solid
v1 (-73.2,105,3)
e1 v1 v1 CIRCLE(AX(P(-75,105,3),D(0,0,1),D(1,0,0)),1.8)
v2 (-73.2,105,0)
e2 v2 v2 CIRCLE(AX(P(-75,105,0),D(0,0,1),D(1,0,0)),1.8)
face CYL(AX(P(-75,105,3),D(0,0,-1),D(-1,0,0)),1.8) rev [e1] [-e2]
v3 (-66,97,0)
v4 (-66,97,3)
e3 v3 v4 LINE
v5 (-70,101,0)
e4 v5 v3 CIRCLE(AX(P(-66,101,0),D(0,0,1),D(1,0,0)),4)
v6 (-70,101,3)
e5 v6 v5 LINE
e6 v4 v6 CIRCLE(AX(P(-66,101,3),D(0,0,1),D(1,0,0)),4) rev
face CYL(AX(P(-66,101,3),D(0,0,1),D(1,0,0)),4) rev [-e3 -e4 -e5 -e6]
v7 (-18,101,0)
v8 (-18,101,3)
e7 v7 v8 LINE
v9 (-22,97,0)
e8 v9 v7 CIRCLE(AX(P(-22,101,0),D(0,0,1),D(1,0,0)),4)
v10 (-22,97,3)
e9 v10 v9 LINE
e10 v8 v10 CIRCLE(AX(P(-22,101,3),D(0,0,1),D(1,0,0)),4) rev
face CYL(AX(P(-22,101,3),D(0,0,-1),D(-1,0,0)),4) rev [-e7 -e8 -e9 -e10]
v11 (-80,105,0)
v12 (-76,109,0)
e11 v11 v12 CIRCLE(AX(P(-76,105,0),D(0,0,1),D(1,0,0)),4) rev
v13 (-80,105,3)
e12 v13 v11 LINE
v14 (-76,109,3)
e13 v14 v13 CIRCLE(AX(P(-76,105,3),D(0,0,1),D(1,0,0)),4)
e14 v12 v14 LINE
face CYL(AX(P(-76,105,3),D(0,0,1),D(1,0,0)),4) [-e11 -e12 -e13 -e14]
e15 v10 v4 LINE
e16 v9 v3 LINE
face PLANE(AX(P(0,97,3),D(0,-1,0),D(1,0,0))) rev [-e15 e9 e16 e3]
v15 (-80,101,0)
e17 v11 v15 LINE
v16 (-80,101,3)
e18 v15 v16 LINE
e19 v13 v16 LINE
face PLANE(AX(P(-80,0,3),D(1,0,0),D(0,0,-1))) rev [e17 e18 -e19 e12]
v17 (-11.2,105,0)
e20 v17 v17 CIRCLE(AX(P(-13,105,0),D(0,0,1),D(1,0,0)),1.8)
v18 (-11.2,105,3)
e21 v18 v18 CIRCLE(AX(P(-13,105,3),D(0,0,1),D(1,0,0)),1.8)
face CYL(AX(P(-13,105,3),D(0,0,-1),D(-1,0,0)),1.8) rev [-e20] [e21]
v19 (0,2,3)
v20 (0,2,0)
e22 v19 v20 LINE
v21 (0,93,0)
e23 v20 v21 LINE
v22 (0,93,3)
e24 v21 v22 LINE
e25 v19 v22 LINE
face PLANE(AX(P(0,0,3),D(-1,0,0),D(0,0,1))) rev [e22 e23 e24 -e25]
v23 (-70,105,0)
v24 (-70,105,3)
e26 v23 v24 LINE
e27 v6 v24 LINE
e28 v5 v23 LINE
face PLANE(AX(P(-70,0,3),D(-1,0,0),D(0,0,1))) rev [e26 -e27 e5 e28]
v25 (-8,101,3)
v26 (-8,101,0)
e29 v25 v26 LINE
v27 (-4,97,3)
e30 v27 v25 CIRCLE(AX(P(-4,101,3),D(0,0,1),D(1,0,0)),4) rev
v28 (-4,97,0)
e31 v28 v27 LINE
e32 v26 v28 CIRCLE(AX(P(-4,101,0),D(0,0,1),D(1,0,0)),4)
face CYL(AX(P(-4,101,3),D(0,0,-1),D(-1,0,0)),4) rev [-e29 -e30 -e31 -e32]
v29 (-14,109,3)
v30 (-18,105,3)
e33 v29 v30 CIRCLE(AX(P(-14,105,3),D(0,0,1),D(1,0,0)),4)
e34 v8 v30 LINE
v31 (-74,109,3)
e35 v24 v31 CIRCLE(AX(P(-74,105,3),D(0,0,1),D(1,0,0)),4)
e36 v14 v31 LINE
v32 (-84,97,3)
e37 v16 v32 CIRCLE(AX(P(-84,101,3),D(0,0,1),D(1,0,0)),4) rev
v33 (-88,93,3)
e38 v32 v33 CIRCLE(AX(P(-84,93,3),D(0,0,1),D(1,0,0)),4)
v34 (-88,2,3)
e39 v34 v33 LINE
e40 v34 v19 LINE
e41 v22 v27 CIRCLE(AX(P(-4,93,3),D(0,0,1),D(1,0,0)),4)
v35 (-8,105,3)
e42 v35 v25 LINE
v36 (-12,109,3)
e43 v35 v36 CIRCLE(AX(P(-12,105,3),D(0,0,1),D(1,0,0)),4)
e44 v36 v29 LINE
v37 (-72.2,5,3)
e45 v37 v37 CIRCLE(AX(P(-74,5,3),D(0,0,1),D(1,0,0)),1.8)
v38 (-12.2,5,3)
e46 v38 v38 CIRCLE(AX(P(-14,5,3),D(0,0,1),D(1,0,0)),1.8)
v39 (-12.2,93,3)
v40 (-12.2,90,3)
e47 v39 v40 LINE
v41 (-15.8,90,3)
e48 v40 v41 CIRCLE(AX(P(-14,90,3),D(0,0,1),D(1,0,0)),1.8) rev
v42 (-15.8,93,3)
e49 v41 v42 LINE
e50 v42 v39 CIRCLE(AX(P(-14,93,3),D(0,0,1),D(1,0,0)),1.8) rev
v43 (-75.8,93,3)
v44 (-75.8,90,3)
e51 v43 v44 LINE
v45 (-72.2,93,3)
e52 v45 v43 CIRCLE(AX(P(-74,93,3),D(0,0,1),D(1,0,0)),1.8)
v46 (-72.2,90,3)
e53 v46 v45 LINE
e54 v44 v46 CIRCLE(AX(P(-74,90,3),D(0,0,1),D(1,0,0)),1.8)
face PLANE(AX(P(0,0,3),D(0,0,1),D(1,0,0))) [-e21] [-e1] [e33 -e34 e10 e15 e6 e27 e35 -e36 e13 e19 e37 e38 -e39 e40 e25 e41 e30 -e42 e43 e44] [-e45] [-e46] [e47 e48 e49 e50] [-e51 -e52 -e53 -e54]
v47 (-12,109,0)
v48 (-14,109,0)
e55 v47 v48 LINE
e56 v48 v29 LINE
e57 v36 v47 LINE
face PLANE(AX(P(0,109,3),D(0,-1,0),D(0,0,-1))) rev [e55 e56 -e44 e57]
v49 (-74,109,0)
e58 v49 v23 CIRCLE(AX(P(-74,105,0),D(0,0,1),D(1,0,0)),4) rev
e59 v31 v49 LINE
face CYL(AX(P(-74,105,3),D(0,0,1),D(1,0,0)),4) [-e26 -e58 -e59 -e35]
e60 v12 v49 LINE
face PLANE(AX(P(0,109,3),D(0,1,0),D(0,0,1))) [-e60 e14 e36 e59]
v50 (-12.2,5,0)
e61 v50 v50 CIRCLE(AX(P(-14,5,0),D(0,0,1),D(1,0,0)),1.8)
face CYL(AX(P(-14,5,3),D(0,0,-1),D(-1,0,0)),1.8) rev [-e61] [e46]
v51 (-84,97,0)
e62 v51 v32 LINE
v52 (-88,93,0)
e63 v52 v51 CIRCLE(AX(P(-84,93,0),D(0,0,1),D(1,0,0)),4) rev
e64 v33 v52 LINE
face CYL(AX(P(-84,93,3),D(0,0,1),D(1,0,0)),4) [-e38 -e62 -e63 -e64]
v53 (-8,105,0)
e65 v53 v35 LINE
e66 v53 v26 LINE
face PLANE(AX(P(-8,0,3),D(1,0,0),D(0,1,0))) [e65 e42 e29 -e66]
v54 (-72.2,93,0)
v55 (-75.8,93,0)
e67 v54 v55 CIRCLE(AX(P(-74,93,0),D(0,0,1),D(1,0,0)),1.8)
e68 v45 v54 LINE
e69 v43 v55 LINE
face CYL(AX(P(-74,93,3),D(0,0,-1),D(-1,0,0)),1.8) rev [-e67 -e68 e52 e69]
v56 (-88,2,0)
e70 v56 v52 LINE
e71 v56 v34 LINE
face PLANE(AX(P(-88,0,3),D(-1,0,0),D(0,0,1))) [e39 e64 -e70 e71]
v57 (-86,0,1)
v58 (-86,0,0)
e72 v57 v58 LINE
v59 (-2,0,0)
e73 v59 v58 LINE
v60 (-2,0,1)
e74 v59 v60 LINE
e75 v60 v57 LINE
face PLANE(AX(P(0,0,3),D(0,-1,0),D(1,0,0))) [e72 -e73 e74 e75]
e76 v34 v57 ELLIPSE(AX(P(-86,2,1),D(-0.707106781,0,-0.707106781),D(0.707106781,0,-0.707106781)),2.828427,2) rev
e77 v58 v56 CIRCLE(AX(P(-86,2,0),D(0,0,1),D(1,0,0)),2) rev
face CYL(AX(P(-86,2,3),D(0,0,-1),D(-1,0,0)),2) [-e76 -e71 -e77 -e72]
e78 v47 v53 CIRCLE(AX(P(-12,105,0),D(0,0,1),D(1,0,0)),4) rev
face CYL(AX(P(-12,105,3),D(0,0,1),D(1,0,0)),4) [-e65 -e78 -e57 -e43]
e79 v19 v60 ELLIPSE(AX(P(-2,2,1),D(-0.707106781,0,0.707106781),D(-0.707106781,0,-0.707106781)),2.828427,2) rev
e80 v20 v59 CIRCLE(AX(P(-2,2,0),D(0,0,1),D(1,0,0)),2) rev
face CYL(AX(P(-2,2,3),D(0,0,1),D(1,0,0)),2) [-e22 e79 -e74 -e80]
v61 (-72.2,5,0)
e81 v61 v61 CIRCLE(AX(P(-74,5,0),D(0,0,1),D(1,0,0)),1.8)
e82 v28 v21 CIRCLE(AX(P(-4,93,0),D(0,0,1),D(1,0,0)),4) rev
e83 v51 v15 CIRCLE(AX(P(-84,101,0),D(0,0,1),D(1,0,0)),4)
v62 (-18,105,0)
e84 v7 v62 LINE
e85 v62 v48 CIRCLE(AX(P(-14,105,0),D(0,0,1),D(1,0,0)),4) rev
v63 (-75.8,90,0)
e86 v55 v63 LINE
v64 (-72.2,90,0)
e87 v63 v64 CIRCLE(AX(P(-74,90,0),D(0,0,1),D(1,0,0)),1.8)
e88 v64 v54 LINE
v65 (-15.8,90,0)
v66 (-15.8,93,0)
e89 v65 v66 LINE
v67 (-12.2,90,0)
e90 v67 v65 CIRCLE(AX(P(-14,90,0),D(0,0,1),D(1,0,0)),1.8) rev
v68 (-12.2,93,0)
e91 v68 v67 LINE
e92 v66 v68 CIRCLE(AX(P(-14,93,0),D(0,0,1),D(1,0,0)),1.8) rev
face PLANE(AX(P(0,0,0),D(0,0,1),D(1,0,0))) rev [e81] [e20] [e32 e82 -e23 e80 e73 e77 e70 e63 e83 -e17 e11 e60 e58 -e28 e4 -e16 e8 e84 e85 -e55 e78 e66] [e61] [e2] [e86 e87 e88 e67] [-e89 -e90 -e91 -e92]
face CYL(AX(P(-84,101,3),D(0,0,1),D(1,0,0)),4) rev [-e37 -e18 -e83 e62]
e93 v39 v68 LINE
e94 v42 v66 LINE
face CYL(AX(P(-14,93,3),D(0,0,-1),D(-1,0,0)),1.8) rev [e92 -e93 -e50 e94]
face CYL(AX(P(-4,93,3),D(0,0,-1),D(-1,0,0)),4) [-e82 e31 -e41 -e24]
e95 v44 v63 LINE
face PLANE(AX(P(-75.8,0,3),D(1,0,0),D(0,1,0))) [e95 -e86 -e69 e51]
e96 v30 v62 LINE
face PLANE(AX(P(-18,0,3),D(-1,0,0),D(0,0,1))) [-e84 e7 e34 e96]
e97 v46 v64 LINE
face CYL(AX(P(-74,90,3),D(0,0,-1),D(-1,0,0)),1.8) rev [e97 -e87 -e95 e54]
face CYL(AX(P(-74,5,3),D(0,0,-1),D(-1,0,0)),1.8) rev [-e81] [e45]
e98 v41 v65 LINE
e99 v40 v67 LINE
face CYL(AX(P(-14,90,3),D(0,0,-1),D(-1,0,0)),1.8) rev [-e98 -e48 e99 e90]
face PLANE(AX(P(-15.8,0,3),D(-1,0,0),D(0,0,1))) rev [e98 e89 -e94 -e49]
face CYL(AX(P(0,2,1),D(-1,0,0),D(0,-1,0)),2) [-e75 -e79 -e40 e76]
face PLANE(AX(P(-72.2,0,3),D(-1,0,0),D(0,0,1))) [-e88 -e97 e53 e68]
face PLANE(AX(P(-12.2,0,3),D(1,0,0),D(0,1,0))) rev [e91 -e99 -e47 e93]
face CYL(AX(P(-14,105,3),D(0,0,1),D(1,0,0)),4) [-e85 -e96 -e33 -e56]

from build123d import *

# Parameters (mm, degrees)
SKETCH1_R           = 1.8
BOSS_EXTRUDE1_DEPTH = 3
FILLET1_R           = 4
FILLET2_R           = 2


with BuildPart() as part:
    # Sketch1 → Boss-Extrude1 (new body)
    with BuildSketch(Plane.XY):
        Polygon((-88, 0), (0, 0), (0, 97), (-8, 97), (-8, 109), (-18, 109), (-18, 97), (-70, 97), (-70, 109), (-80, 109), (-80, 97), (-88, 97), align=None)
        with Locations((-74, 5)):
            Circle(SKETCH1_R, mode=Mode.SUBTRACT)
        with Locations((-14, 5)):
            Circle(SKETCH1_R, mode=Mode.SUBTRACT)
        with BuildLine():
            ThreePointArc((-75.8, 93), (-74, 94.8), (-72.2, 93))
            Line((-72.2, 93), (-72.2, 90))
            ThreePointArc((-72.2, 90), (-74, 88.2), (-75.8, 90))
            Line((-75.8, 90), (-75.8, 93))
        make_face(mode=Mode.SUBTRACT)
        with BuildLine():
            ThreePointArc((-12.2, 90), (-14, 88.2), (-15.8, 90))
            Line((-15.8, 90), (-15.8, 93))
            ThreePointArc((-15.8, 93), (-14, 94.8), (-12.2, 93))
            Line((-12.2, 93), (-12.2, 90))
        make_face(mode=Mode.SUBTRACT)
        with Locations((-13, 105)):
            Circle(SKETCH1_R, mode=Mode.SUBTRACT)
        with Locations((-75, 105)):
            Circle(SKETCH1_R, mode=Mode.SUBTRACT)
    extrude(amount=BOSS_EXTRUDE1_DEPTH)

    # Fillet1
    fillet1_edges = [part.edges().sort_by_distance(p)[0] for p in [
        (-70, 109, 1.5),
        (-70, 97, 1.5),
        (-18, 97, 1.5),
        (-18, 109, 1.5),
        (-8, 109, 1.5),
        (-8, 97, 1.5),
        (0, 97, 1.5),
        (-88, 97, 1.5),
        (-80, 97, 1.5),
        (-80, 109, 1.5),
    ]]
    fillet(fillet1_edges, radius=FILLET1_R - 0.0001)  # a hair under: the kernel refuses the full size

    # Fillet2
    fillet2_edges = [part.edges().sort_by_distance(p)[0] for p in [
        (-44, 0, 3),
        (0, 0, 1.5),
        (-88, 0, 1.5),
    ]]
    fillet(fillet2_edges, radius=FILLET2_R)


solid = part.part
